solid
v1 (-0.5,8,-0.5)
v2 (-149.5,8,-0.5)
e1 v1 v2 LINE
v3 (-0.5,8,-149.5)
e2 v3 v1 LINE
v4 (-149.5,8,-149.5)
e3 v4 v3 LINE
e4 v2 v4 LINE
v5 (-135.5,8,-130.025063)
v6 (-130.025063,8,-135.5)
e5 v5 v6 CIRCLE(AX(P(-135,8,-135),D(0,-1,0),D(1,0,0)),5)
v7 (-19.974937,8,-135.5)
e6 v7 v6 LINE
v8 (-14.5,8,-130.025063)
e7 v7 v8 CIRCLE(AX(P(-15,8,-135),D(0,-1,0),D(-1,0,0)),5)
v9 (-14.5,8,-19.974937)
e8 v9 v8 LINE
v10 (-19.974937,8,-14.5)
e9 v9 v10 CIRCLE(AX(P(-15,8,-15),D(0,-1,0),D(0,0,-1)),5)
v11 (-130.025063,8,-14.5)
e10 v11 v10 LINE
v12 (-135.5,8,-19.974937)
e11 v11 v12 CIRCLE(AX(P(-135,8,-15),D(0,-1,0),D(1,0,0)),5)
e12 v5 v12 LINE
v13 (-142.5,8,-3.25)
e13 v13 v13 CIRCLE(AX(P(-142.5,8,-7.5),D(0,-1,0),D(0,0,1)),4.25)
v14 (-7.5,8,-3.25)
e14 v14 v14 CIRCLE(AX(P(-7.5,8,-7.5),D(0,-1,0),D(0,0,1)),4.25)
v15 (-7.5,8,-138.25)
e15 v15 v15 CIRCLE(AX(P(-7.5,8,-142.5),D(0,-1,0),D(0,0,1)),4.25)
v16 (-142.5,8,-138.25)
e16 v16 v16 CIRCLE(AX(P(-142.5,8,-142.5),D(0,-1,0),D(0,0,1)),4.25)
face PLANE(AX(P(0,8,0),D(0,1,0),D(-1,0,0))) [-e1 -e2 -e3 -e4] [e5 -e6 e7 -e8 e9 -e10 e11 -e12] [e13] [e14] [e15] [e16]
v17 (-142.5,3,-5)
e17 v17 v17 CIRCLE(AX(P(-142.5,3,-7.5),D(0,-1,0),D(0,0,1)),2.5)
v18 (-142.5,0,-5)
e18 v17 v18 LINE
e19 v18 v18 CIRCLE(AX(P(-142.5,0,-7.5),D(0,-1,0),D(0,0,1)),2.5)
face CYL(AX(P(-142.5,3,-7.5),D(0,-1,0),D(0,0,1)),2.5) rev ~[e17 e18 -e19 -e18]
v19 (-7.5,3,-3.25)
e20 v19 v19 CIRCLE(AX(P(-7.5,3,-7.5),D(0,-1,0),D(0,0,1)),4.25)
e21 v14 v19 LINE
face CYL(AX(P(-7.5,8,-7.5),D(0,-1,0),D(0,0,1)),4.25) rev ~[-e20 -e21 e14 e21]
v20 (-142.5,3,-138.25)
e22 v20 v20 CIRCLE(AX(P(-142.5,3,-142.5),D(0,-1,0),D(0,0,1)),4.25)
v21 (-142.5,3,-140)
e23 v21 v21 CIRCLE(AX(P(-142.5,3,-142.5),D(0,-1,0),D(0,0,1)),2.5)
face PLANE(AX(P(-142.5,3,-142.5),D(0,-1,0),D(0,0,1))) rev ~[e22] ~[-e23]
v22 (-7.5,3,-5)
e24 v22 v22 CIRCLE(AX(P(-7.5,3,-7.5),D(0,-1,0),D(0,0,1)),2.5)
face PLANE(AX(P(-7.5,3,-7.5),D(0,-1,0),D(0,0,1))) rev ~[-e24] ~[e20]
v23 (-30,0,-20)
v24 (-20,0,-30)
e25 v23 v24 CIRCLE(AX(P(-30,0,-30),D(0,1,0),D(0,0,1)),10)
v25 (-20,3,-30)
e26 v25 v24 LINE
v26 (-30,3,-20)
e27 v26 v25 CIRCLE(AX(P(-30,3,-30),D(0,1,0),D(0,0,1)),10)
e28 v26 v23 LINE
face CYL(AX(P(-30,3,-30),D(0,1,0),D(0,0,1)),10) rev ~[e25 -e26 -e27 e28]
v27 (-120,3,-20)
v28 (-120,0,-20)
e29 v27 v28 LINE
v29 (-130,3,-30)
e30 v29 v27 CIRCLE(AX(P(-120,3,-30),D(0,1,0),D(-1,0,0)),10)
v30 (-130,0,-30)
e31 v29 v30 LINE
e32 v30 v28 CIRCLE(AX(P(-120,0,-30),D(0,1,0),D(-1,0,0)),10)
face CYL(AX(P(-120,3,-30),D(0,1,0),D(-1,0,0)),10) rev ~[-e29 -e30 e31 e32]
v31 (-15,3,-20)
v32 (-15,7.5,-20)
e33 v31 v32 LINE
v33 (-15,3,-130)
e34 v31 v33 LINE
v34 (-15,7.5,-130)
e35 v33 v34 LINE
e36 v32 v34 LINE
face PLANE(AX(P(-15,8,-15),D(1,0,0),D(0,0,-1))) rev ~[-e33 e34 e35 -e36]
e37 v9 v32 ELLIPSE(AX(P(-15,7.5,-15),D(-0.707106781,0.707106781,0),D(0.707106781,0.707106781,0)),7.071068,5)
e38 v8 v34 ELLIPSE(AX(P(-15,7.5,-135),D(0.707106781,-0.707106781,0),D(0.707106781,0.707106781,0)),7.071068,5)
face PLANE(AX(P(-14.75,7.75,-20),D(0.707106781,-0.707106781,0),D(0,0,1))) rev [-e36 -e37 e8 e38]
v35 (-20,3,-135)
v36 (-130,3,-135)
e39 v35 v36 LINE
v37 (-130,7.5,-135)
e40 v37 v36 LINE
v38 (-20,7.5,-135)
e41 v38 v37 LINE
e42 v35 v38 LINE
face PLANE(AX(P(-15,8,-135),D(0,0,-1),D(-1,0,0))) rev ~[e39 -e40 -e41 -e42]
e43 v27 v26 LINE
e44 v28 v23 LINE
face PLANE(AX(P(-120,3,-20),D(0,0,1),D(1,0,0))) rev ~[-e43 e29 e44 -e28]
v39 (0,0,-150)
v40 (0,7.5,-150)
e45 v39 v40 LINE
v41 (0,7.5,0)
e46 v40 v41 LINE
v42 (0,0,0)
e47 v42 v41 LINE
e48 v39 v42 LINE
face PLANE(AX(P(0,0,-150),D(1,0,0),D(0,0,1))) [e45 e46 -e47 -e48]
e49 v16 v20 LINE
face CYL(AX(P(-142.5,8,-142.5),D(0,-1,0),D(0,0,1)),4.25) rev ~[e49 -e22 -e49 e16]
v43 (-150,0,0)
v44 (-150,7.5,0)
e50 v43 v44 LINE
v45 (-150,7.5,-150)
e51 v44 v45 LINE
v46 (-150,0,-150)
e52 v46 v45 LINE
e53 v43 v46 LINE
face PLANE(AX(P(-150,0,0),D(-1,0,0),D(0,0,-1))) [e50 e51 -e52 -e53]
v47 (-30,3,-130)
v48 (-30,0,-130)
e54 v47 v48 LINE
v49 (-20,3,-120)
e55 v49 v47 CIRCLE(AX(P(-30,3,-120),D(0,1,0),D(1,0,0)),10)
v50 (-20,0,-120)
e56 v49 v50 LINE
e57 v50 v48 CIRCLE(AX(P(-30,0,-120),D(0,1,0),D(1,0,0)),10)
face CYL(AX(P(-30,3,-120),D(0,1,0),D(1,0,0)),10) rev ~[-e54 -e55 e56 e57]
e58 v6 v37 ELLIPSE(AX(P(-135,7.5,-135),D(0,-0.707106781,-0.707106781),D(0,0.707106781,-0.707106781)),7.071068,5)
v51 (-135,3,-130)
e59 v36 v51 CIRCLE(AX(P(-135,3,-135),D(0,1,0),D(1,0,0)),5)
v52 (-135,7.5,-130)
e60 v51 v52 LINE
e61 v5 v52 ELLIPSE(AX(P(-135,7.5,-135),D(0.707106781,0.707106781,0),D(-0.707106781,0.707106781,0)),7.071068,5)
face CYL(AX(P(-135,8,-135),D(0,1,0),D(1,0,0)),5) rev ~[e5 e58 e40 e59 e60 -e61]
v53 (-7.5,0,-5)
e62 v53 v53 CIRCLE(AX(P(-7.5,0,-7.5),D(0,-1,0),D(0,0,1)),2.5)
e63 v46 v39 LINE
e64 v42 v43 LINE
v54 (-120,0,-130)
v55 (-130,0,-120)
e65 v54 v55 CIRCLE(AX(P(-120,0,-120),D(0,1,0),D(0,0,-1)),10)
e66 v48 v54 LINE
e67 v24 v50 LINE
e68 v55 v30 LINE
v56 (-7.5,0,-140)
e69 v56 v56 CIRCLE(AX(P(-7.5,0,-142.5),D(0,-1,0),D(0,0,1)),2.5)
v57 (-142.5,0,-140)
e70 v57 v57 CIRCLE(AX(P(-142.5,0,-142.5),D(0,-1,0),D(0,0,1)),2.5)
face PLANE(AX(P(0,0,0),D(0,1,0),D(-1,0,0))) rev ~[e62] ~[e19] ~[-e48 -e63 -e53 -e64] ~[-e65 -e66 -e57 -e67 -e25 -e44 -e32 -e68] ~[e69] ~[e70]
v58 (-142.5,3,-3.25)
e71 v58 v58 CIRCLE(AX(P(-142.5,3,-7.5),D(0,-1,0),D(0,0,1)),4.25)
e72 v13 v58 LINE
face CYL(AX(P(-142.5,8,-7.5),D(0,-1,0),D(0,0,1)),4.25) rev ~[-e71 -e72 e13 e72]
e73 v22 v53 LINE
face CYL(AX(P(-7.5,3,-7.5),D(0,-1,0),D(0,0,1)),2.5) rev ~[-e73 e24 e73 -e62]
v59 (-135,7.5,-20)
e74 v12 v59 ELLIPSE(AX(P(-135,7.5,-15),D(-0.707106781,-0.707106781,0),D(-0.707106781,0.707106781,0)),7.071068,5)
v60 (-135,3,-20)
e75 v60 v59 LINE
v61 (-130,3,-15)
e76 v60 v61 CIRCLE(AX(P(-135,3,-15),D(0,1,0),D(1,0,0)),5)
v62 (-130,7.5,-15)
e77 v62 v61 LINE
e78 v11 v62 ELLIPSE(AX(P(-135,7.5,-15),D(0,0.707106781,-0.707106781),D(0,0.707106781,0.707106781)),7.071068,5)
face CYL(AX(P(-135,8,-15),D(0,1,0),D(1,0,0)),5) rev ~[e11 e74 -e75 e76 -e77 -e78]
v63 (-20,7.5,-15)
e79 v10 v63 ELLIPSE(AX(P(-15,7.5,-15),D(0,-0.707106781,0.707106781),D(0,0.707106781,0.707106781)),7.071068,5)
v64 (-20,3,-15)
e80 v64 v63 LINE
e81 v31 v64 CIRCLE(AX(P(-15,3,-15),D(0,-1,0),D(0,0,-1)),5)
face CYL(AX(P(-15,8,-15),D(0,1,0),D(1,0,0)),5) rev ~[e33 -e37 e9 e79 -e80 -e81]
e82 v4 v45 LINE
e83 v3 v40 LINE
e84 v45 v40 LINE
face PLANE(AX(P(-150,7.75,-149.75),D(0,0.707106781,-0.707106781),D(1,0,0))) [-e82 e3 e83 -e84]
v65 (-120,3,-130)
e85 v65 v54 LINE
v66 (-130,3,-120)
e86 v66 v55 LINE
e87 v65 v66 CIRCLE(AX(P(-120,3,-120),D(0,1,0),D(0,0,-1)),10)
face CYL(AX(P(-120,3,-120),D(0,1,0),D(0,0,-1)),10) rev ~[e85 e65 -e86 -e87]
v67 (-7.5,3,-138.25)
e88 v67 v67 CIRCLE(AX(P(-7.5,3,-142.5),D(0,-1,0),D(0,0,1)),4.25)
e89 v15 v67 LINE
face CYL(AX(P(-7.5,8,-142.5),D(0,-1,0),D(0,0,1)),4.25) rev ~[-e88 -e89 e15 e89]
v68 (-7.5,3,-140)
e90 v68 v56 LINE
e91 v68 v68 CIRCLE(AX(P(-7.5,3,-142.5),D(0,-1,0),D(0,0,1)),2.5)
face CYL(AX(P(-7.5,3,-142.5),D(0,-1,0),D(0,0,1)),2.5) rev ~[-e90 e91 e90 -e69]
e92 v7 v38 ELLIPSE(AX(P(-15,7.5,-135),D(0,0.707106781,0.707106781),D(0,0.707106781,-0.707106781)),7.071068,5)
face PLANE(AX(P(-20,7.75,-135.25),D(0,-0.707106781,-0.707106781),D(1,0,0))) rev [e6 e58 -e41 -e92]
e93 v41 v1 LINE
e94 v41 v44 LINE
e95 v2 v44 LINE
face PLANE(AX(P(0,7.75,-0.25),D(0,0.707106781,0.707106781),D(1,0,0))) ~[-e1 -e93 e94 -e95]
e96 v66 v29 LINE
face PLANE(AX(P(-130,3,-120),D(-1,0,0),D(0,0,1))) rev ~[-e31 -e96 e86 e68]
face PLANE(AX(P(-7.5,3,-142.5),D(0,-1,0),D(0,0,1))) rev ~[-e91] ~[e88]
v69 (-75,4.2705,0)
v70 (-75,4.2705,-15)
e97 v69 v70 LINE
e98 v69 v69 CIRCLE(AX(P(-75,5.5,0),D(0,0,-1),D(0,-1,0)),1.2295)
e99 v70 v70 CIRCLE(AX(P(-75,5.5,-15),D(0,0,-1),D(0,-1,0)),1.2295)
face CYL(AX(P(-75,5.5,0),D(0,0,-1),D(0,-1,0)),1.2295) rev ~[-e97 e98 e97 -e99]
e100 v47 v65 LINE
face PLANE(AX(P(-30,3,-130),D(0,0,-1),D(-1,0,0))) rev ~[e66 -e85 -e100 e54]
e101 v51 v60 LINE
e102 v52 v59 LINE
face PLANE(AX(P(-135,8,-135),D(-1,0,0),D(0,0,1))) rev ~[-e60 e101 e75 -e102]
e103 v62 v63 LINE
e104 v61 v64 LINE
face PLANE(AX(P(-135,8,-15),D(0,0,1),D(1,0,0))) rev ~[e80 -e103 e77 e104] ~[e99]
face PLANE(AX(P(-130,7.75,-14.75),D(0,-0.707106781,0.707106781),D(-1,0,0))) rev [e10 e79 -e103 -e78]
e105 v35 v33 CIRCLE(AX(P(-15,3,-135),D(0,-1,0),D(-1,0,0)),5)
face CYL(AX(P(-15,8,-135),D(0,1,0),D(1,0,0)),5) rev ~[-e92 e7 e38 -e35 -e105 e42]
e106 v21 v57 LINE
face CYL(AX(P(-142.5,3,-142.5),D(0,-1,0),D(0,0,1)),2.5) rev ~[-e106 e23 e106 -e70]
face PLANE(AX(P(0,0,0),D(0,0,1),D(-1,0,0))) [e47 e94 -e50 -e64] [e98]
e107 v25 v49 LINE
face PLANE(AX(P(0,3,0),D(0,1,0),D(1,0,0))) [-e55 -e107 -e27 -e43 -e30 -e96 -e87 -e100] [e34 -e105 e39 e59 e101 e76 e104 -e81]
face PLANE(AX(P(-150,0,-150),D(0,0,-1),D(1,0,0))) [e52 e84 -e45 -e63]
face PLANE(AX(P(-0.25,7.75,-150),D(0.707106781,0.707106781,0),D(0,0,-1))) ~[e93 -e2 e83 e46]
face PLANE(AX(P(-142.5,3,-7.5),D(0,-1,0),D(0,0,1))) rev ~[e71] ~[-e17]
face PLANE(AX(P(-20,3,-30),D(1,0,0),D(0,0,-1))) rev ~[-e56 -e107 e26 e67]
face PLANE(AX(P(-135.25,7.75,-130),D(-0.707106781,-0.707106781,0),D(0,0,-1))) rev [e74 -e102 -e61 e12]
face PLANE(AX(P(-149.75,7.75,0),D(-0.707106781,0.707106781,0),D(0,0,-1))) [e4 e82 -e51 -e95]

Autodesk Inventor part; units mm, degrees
ref_plane "YZ Plane" through (0, 0, 0) normal (1, 0, 0) x (0, 1, 0)
ref_plane "XZ Plane" through (0, 0, 0) normal (0, 1, 0) x (-1, 0, 0)
ref_plane "XY Plane" through (0, 0, 0) normal (0, 0, 1) x (1, 0, 0)
sketch "Esboço1" plane through (0, 0, 0) normal (0, 1, 0) x (-1, 0, 0)
  line L0 (0, 0) -> (150, 0)
  line L1 (150, 0) -> (150, -150)
  line L2 (150, -150) -> (0, -150)
  line L3 (0, -150) -> (0, 0)
  dimension "d0" = 150
  dimension "d1" = 150
extrude "Extrusão1" add sketch "Esboço1" along normal blind 8
sketch "Esboço2" plane through (0, 8, 0) normal (0, 1, 0) x (1, 0, 0)
  line L0 (-135, 15) -> (-15, 15)
  line L1 (-15, 15) -> (-15, 135)
  line L2 (-15, 135) -> (-135, 135)
  line L3 (-135, 135) -> (-135, 15)
  line L4 (0, 150) -> (-150, 150) projected
  line L5 (0, 0) -> (0, 150) projected
  point P0 (-75, 135)
  point P1 (-75, 150)
  point P2 (0, 75)
  point P3 (-135, 75)
  dimension "d4" = 120
  dimension "d5" = 120
  dimension "d6" = 0
  dimension "d7" = 0
extrude "Extrusão2" cut sketch "Esboço2" against normal blind 5
sketch "Esboço3" plane through (0, 3, 0) normal (0, 1, 0) x (1, 0, 0)
  line L0 (-120, 20) -> (-30, 20)
  line L1 (-20, 30) -> (-20, 120)
  line L2 (-30, 130) -> (-120, 130)
  line L3 (-130, 120) -> (-130, 30)
  line L4 (-135, 15) -> (-135, 135) projected
  line L5 (-135, 135) -> (-15, 135) projected
  arc A0 (-120, 130) -> (-130, 120) centre (-120, 120) ccw
  arc A1 (-20, 120) -> (-30, 130) centre (-30, 120) ccw
  arc A2 (-30, 20) -> (-20, 30) centre (-30, 30) ccw
  arc A3 (-130, 30) -> (-120, 20) centre (-120, 30) ccw
  point P0 (0, 0)
  point P1 (-130, 20)
  point P2 (-20, 130)
  point P3 (-20, 20)
  point P4 (-130, 130)
  point P5 (-135, 75)
  point P6 (-130, 75)
  point P7 (-75, 135)
  point P8 (-75, 130)
  dimension "d10" = 110
  dimension "d11" = 0
  dimension "d12" = 0
  dimension "d52" = 10
extrude "Extrusão3" cut sketch "Esboço3" against normal up to surface (3 mm away)
sketch "Esboço4" plane through (0, 8, 0) normal (0, 1, 0) x (1, 0, 0)
  circle A0 centre (-15, 15) radius 5
  circle A1 centre (-135, 15) radius 5
  circle A2 centre (-135, 135) radius 5
  circle A3 centre (-15, 135) radius 5
  line L0 (-15, 135) -> (-15, 15) projected
  line L1 (-15, 15) -> (-135, 15) projected
  line L2 (-135, 15) -> (-135, 135) projected
  line L3 (-135, 135) -> (-15, 135) projected
  point P0 (0, 0)
  dimension "d15" = 10
  dimension "d16" = 0
  dimension "d17" = 0
  dimension "d18" = 0
  dimension "d19" = 0
  dimension "d20" = 0
  dimension "d21" = 0
  dimension "d22" = 0
  dimension "d23" = 0
extrude "Extrusão4" cut sketch "Esboço4" against normal blind 5 contours A0 L1 L0 | L0 L1 A0 | L0 L3 A3 | A3 L3 L0 | L1 L2 A1 | A1 L2 L1 | L3 L2 A2 | A2 L2 L3
sketch "Esboço5" plane through (-150, 0, 0) normal (0, 0, 1) x (1, 0, 0)
  line L0 (130, 3) -> (20, 3) projected
  line L1 (0, 8) -> (150, 8) projected
  point P0 (150, 0)
  point P1 (75, 5.5)
  point P2 (75, 8)
  dimension "d26" = 5
  dimension "d27" = 2.5
  dimension "d28" = 0
hole "Furo1" at (-75, 5.5, 0) direction (0, 0, -1) diameter 2.459 end up to surface thread size "M3x0.5" class "6H" standard "ISO Metric profile"
sketch "Esboço6" plane through (0, 8, 0) normal (0, 1, 0) x (1, 0, 0)
  line L0 (-150, 150) -> (-150, 0) projected
  line L1 (-135, 20) -> (-135, 130) projected
  line L2 (0, 150) -> (-150, 150) projected
  line L3 (0, 0) -> (0, 150) projected
  line L4 (-150, 0) -> (0, 0) projected
  point P0 (-142.5, 7.5)
  point P1 (-142.5, 142.5)
  point P2 (-7.5, 142.5)
  point P3 (-7.5, 7.5)
  point P4 (-135, 75)
  point P5 (-150, 75)
  dimension "d36" = 7.5
  dimension "d37" = 15
  dimension "d38" = 7.5
  dimension "d39" = 7.5
  dimension "d40" = 7.5
  dimension "d41" = 7.5
  dimension "d42" = 7.5
  dimension "d43" = 7.5
  dimension "d44" = 7.5
hole "Furo2" at (-142.5, 8, -7.5) at (-142.5, 8, -142.5) at (-7.5, 8, -142.5) at (-7.5, 8, -7.5) direction (0, -1, 0) diameter 5 depth 8 counterbore diameter 8.5 counterbore depth 5
chamfer "Chamfer1" distance 0.5 angle 45 8 edges at (-150, 8, -75) (-75, 8, -150) (0, 8, -75) (-75, 8, 0) (-75, 8, -15) (-15, 8, -75) (-75, 8, -135) (-135, 8, -75)
equation "\"d27\" = 0.5 * d26"
equation "\"d36\" = 0.5 * d37"
equation "\"d38\" = d36"
equation "\"d39\" = d36"
equation "\"d40\" = d36"
equation "\"d41\" = d40"
equation "\"d42\" = d41"
equation "\"d43\" = d42"
equation "\"d44\" = d43"
equation "\"Raio_vergadura\" = Espessura"
equation "\"Largura_alívio_de_vergadura\" = Espessura"
equation "\"Profundidade_alívio_de_vergadura\" = 0.5 * Espessura"
equation "\"Tamanho_alívio_de_dobra\" = 4 * Espessura"
equation "\"Remanescente_mínimo\" = 2 * Espessura"
equation "\"Raiodetransição\" = Raio_vergadura"
equation "\"Tamanho_de_raio_de_Jacobi\" = Raio_vergadura"
equation "\"TamanhoFolga\" = Espessura"
equation "\"Espessura\" = 0.5"
properties part number "Suporte base da mesa" material "Brass, Soft Yellow"
